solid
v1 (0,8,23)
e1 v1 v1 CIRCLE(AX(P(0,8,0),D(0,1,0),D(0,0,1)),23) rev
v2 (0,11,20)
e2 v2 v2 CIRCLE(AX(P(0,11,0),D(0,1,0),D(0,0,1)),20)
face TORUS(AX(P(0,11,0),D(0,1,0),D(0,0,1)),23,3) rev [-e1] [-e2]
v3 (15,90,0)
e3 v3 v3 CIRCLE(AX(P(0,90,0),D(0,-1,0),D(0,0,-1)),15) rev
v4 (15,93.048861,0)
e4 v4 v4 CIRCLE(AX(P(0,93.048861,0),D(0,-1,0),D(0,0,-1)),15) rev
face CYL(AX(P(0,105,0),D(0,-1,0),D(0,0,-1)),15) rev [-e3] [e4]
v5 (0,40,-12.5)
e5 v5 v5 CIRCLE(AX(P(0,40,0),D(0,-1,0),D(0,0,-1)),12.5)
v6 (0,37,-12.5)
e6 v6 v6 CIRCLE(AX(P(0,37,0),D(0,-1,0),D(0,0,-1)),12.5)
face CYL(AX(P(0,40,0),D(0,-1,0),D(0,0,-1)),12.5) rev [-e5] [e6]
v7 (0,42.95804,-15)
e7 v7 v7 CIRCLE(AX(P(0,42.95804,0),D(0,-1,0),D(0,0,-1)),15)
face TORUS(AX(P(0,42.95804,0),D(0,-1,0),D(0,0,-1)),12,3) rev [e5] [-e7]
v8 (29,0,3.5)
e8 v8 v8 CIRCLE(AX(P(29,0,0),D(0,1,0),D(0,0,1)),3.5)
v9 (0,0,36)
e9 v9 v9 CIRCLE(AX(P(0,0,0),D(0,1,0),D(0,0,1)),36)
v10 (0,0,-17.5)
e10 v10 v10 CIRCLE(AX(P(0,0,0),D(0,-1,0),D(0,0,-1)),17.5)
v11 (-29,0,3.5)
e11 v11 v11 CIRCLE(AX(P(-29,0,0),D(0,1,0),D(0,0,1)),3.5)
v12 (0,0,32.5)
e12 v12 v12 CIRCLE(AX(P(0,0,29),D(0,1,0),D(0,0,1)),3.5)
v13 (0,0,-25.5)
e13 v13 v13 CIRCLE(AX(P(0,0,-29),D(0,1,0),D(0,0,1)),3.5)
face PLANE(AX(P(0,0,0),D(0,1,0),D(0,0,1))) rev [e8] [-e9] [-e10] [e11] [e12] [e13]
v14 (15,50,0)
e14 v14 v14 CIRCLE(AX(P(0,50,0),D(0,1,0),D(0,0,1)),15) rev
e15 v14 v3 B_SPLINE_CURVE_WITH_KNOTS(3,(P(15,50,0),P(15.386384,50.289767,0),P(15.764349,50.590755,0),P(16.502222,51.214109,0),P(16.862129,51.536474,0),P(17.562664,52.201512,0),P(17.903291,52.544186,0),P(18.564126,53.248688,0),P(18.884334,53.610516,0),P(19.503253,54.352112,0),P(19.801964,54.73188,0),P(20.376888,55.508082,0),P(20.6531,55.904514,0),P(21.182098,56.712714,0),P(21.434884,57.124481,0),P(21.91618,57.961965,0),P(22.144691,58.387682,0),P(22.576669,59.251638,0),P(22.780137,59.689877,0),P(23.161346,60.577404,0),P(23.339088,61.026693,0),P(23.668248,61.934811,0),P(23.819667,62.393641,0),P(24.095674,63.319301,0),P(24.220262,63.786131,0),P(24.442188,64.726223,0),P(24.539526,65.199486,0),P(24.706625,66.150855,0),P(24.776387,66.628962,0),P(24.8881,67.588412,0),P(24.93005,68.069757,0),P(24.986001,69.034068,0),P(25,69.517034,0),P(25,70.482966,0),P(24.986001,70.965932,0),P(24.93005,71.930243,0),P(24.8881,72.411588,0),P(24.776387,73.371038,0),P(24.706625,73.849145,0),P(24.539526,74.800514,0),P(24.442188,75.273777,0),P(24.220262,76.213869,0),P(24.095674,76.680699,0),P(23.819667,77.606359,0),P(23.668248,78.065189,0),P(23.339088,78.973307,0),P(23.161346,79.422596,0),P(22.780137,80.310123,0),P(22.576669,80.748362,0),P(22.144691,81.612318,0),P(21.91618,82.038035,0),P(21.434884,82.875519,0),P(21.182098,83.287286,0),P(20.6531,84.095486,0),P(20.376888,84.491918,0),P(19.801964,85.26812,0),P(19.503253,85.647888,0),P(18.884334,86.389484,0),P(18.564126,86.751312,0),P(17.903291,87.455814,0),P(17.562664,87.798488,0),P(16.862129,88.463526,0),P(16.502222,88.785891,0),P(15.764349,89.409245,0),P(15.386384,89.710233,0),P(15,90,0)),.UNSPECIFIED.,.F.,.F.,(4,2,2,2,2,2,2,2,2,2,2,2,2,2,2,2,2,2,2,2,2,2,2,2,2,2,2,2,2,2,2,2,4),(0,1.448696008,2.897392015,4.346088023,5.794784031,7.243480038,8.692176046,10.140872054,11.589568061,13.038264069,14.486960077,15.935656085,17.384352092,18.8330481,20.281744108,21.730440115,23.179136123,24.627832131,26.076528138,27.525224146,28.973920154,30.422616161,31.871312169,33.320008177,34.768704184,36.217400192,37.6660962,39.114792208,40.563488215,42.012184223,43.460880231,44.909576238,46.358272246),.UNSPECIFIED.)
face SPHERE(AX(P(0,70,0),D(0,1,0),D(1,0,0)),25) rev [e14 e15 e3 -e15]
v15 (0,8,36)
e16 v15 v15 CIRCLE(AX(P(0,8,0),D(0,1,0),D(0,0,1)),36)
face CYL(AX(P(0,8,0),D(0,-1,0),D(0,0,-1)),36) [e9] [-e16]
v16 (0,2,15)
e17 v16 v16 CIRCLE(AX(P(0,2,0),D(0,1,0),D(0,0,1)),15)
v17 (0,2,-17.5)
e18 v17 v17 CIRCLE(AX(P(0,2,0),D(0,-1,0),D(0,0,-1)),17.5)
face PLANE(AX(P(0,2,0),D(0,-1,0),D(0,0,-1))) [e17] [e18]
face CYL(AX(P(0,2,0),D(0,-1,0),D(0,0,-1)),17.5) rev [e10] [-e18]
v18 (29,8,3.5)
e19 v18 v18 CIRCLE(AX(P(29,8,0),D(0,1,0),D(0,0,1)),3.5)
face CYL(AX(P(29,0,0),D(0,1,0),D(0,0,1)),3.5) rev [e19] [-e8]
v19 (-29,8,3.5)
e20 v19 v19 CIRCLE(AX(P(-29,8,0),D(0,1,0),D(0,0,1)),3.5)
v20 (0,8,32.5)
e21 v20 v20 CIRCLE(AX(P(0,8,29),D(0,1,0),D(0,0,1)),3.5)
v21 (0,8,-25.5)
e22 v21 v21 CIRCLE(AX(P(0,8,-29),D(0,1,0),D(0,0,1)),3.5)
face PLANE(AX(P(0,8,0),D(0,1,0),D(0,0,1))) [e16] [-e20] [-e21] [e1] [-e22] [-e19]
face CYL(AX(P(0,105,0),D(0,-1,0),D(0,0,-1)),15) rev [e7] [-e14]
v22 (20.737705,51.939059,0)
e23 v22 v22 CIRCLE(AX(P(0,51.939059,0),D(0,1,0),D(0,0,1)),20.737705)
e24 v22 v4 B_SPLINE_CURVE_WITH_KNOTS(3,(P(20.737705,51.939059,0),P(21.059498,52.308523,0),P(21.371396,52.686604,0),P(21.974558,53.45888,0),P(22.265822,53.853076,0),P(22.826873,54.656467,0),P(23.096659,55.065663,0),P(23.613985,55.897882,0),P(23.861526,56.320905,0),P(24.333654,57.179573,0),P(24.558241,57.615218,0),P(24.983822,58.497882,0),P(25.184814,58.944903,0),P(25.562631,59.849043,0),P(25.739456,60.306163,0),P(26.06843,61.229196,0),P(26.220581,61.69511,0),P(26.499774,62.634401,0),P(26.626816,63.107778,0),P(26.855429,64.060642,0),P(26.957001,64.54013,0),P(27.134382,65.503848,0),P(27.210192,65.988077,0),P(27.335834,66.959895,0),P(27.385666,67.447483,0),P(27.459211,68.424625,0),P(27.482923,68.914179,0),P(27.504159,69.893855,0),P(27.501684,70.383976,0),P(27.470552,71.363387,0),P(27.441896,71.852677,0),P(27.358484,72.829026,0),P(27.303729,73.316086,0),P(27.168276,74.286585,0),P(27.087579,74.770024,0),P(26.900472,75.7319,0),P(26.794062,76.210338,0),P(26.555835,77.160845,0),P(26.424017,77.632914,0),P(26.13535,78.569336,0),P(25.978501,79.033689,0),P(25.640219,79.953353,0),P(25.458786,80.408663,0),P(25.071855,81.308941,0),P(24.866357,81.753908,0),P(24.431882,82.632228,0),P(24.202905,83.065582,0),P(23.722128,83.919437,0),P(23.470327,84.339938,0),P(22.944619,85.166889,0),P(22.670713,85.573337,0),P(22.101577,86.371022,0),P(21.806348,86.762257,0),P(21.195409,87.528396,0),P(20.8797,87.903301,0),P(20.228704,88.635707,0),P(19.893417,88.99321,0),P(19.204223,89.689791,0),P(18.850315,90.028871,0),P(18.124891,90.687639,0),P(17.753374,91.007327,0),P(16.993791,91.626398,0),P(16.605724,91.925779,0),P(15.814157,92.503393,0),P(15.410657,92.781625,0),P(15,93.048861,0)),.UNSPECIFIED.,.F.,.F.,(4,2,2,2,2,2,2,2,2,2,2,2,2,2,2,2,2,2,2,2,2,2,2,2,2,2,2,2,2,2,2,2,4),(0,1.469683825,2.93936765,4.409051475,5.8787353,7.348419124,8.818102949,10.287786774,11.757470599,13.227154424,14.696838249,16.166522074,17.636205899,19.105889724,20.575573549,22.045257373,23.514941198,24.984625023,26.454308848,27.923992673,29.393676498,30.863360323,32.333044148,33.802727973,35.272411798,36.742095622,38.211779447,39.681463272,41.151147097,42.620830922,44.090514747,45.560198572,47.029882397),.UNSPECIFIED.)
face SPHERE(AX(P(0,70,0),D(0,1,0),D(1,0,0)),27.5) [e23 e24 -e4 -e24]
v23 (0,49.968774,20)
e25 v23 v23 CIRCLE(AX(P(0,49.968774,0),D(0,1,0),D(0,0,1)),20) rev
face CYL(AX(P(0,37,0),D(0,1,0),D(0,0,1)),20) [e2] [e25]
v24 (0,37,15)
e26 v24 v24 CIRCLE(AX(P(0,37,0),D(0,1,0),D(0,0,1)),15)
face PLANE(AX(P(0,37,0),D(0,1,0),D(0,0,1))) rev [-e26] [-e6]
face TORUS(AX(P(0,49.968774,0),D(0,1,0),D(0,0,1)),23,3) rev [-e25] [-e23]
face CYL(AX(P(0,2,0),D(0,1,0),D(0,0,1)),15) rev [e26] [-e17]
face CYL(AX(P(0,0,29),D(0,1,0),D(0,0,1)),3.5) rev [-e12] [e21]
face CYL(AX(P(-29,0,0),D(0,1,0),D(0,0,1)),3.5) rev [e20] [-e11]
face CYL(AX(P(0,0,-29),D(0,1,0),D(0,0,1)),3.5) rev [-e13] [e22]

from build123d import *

# Parameters (mm, degrees)
IZIM1_R                     = 36
Y_KSEKLIK_EKSTR_ZYON1_DEPTH = 8
IZIM2_R                     = 3.5
KES_EKSTR_ZYON1_DEPTH       = 8
IZIM3_R                     = 17.5
KES_EKSTR_ZYON2_DEPTH       = 2
IZIM4_W                     = 20
IZIM4_H                     = 29
KES_EKSTR_ZYON3_DEPTH       = 29
KES_EKSTR_ZYON3_DEPTH_BACK  = 6
IZIM5_R                     = 15
Y_KSEKLIK_EKSTR_ZYON2_START = 3
IZIM6_R                     = 20
Y_KSEKLIK_EKSTR_ZYON2_DEPTH = 3
IZIM8_R                     = 12.5
KES_EKSTR_ZYON4_DEPTH       = 3
IZIM13_R                    = 15
KES_EKSTR_ZYON5_DEPTH       = 65
RADYUS2_R                   = 3
RADYUS3_R                   = 3
RADYUS4_R                   = 3


with BuildPart() as part:
    # Çizim1 → Yükseklik-Ekstrüzyon1 (new body)
    with BuildSketch(Plane(origin=(0, 0, 0), x_dir=(1, 0, 0), z_dir=(0, 1, 0))):
        with Locations(Location((0, 0, 0), (0, 0, 270))):
            Circle(IZIM1_R)
    extrude(amount=Y_KSEKLIK_EKSTR_ZYON1_DEPTH)

    # Çizim2 → Kes-Ekstrüzyon1 (cut)
    with BuildSketch(Plane(origin=(0, 8, 0), x_dir=(1, 0, 0), z_dir=(0, 1, 0))):
        with Locations(Location((0, 29, 0), (0, 0, 270))):
            Circle(IZIM2_R)
        with Locations(Location((29, 0, 0), (0, 0, 270))):
            Circle(IZIM2_R)
        with Locations(Location((0, -29, 0), (0, 0, 270))):
            Circle(IZIM2_R)
        with Locations(Location((-29, 0, 0), (0, 0, 270))):
            Circle(IZIM2_R)
    extrude(amount=-KES_EKSTR_ZYON1_DEPTH, mode=Mode.SUBTRACT)

    # Çizim3 → Kes-Ekstrüzyon2 (cut)
    with BuildSketch(Plane.XZ):
        with Locations(Location((0, 0, 0), (0, 0, 270))):
            Circle(IZIM3_R)
    extrude(amount=-KES_EKSTR_ZYON2_DEPTH, mode=Mode.SUBTRACT)

    # Çizim4 → Döndür1 (revolve)
    with BuildSketch(Plane(origin=(0, 0, 0), x_dir=(0, 0, -1), z_dir=(1, 0, 0)), mode=Mode.PRIVATE) as d_nd_r1_sk:
        with Locations((10, 22.5)):
            Rectangle(IZIM4_W, IZIM4_H)
    revolve(d_nd_r1_sk.sketch.rotate(Axis((0, 37, 0), (0, -1, 0)), 180), axis=Axis((0, 37, 0), (0, -1, 0)))

    # Çizim5 → Kes-Ekstrüzyon3 (cut, two sides: drawn at the far end of the back side and taken through both)
    with BuildSketch(Plane(origin=(0, 8, 0), x_dir=(1, 0, 0), z_dir=(0, 1, 0)).offset(-KES_EKSTR_ZYON3_DEPTH_BACK)):
        with Locations(Location((0, 0, 0), (0, 0, 270))):
            Circle(IZIM5_R)
    extrude(amount=KES_EKSTR_ZYON3_DEPTH + KES_EKSTR_ZYON3_DEPTH_BACK, mode=Mode.SUBTRACT)

    # Çizim6 → Yükseklik-Ekstrüzyon2 (add)
    with BuildSketch(Plane(origin=(0, 37, 0), x_dir=(1, 0, 0), z_dir=(0, 1, 0)).offset(Y_KSEKLIK_EKSTR_ZYON2_START)):
        with Locations(Location((0, 0, 0), (0, 0, 270))):
            Circle(IZIM6_R)
    extrude(amount=-Y_KSEKLIK_EKSTR_ZYON2_DEPTH)

    # Çizim8 → Kes-Ekstrüzyon4 (cut)
    with BuildSketch(Plane.XZ.offset(-37)):
        with Locations(Location((0, 0, 0), (0, 0, 270))):
            Circle(IZIM8_R)
    extrude(amount=-KES_EKSTR_ZYON4_DEPTH, mode=Mode.SUBTRACT)



with BuildPart() as body_2:
    # Çizim10 → Döndür15 (revolve)
    with BuildSketch(Plane.XY, mode=Mode.PRIVATE) as d_nd_r15_sk:
        with BuildLine():
            Line((0, 95), (0, 97.5))
            ThreePointArc((0, 97.5), (-25.251743677, 80.89033706), (-20, 51.125413912))
            ThreePointArc((-20, 51.125413912), (-10.89033706, 44.748256323), (0, 42.5))
            Line((0, 42.5), (0, 45))
            ThreePointArc((0, 45), (-25, 70), (0, 95))
        make_face()
    revolve(d_nd_r15_sk.sketch.rotate(Axis((0, 97.5, 0), (0, -1, 0)), 180), axis=Axis((0, 97.5, 0), (0, -1, 0)))


with BuildPart() as part_1:
    add(part.part)

    add(body_2.part)  # Döndür17 merges body 2
    # Çizim10<16> → Döndür17 (revolve)
    with BuildSketch(Plane.XY, mode=Mode.PRIVATE) as d_nd_r17_sk:
        with BuildLine():
            Line((-20, 51.125413912), (-20, 40))
            Line((-20, 40), (0, 40))
            Line((0, 40), (0, 42.5))
            ThreePointArc((0, 42.5), (-10.89033706, 44.748256323), (-20, 51.125413912))
        make_face()
    revolve(d_nd_r17_sk.sketch.rotate(Axis((0, 97.5, 0), (0, -1, 0)), 270), axis=Axis((0, 97.5, 0), (0, -1, 0)))

    # Çizim13 → Kes-Ekstrüzyon5 (cut)
    with BuildSketch(Plane.XZ.offset(-40)):
        with Locations(Location((0, 0, 0), (0, 0, 90))):
            Circle(IZIM13_R)
    extrude(amount=-KES_EKSTR_ZYON5_DEPTH, mode=Mode.SUBTRACT)

    # Radyus2
    radyus2_edges = [part_1.edges().sort_by_distance(p)[0] for p in [
        (14.142135624, 51.125413912, 14.142135624),
    ]]
    fillet(radyus2_edges, radius=RADYUS2_R)

    # Radyus3
    # the kernel refuses this fillet: 3 mm, written as the material it adds along each edge
    with BuildSketch(Plane(origin=(0, 40, 0), x_dir=(0, 0, 1), z_dir=(1, 0, 0))) as radyus3_piece_1:
        with BuildLine():
            CenterArc((12, -2.958039892), RADYUS3_R, 0, 80.405931773)
            Line((12.5, 0), (12.51, 0.059160798))
            ThreePointArc((12.51, 0.059160798), (13.75, 0.06), (15, 0.06))
            Line((15, 0.06), (15.06, 0))
            Line((15.06, 0), (15.06, -2.958039892))
            Line((15.06, -2.958039892), (15, -2.958039892))
        make_face()
    revolve(axis=Axis((0, 40, 0), (0, -1, 0)))

    # Radyus4
    radyus4_edges = [part_1.edges().sort_by_distance(p)[0] for p in [
        (0, 8, -20),
    ]]
    fillet(radyus4_edges, radius=RADYUS4_R)


solid = part_1.part
